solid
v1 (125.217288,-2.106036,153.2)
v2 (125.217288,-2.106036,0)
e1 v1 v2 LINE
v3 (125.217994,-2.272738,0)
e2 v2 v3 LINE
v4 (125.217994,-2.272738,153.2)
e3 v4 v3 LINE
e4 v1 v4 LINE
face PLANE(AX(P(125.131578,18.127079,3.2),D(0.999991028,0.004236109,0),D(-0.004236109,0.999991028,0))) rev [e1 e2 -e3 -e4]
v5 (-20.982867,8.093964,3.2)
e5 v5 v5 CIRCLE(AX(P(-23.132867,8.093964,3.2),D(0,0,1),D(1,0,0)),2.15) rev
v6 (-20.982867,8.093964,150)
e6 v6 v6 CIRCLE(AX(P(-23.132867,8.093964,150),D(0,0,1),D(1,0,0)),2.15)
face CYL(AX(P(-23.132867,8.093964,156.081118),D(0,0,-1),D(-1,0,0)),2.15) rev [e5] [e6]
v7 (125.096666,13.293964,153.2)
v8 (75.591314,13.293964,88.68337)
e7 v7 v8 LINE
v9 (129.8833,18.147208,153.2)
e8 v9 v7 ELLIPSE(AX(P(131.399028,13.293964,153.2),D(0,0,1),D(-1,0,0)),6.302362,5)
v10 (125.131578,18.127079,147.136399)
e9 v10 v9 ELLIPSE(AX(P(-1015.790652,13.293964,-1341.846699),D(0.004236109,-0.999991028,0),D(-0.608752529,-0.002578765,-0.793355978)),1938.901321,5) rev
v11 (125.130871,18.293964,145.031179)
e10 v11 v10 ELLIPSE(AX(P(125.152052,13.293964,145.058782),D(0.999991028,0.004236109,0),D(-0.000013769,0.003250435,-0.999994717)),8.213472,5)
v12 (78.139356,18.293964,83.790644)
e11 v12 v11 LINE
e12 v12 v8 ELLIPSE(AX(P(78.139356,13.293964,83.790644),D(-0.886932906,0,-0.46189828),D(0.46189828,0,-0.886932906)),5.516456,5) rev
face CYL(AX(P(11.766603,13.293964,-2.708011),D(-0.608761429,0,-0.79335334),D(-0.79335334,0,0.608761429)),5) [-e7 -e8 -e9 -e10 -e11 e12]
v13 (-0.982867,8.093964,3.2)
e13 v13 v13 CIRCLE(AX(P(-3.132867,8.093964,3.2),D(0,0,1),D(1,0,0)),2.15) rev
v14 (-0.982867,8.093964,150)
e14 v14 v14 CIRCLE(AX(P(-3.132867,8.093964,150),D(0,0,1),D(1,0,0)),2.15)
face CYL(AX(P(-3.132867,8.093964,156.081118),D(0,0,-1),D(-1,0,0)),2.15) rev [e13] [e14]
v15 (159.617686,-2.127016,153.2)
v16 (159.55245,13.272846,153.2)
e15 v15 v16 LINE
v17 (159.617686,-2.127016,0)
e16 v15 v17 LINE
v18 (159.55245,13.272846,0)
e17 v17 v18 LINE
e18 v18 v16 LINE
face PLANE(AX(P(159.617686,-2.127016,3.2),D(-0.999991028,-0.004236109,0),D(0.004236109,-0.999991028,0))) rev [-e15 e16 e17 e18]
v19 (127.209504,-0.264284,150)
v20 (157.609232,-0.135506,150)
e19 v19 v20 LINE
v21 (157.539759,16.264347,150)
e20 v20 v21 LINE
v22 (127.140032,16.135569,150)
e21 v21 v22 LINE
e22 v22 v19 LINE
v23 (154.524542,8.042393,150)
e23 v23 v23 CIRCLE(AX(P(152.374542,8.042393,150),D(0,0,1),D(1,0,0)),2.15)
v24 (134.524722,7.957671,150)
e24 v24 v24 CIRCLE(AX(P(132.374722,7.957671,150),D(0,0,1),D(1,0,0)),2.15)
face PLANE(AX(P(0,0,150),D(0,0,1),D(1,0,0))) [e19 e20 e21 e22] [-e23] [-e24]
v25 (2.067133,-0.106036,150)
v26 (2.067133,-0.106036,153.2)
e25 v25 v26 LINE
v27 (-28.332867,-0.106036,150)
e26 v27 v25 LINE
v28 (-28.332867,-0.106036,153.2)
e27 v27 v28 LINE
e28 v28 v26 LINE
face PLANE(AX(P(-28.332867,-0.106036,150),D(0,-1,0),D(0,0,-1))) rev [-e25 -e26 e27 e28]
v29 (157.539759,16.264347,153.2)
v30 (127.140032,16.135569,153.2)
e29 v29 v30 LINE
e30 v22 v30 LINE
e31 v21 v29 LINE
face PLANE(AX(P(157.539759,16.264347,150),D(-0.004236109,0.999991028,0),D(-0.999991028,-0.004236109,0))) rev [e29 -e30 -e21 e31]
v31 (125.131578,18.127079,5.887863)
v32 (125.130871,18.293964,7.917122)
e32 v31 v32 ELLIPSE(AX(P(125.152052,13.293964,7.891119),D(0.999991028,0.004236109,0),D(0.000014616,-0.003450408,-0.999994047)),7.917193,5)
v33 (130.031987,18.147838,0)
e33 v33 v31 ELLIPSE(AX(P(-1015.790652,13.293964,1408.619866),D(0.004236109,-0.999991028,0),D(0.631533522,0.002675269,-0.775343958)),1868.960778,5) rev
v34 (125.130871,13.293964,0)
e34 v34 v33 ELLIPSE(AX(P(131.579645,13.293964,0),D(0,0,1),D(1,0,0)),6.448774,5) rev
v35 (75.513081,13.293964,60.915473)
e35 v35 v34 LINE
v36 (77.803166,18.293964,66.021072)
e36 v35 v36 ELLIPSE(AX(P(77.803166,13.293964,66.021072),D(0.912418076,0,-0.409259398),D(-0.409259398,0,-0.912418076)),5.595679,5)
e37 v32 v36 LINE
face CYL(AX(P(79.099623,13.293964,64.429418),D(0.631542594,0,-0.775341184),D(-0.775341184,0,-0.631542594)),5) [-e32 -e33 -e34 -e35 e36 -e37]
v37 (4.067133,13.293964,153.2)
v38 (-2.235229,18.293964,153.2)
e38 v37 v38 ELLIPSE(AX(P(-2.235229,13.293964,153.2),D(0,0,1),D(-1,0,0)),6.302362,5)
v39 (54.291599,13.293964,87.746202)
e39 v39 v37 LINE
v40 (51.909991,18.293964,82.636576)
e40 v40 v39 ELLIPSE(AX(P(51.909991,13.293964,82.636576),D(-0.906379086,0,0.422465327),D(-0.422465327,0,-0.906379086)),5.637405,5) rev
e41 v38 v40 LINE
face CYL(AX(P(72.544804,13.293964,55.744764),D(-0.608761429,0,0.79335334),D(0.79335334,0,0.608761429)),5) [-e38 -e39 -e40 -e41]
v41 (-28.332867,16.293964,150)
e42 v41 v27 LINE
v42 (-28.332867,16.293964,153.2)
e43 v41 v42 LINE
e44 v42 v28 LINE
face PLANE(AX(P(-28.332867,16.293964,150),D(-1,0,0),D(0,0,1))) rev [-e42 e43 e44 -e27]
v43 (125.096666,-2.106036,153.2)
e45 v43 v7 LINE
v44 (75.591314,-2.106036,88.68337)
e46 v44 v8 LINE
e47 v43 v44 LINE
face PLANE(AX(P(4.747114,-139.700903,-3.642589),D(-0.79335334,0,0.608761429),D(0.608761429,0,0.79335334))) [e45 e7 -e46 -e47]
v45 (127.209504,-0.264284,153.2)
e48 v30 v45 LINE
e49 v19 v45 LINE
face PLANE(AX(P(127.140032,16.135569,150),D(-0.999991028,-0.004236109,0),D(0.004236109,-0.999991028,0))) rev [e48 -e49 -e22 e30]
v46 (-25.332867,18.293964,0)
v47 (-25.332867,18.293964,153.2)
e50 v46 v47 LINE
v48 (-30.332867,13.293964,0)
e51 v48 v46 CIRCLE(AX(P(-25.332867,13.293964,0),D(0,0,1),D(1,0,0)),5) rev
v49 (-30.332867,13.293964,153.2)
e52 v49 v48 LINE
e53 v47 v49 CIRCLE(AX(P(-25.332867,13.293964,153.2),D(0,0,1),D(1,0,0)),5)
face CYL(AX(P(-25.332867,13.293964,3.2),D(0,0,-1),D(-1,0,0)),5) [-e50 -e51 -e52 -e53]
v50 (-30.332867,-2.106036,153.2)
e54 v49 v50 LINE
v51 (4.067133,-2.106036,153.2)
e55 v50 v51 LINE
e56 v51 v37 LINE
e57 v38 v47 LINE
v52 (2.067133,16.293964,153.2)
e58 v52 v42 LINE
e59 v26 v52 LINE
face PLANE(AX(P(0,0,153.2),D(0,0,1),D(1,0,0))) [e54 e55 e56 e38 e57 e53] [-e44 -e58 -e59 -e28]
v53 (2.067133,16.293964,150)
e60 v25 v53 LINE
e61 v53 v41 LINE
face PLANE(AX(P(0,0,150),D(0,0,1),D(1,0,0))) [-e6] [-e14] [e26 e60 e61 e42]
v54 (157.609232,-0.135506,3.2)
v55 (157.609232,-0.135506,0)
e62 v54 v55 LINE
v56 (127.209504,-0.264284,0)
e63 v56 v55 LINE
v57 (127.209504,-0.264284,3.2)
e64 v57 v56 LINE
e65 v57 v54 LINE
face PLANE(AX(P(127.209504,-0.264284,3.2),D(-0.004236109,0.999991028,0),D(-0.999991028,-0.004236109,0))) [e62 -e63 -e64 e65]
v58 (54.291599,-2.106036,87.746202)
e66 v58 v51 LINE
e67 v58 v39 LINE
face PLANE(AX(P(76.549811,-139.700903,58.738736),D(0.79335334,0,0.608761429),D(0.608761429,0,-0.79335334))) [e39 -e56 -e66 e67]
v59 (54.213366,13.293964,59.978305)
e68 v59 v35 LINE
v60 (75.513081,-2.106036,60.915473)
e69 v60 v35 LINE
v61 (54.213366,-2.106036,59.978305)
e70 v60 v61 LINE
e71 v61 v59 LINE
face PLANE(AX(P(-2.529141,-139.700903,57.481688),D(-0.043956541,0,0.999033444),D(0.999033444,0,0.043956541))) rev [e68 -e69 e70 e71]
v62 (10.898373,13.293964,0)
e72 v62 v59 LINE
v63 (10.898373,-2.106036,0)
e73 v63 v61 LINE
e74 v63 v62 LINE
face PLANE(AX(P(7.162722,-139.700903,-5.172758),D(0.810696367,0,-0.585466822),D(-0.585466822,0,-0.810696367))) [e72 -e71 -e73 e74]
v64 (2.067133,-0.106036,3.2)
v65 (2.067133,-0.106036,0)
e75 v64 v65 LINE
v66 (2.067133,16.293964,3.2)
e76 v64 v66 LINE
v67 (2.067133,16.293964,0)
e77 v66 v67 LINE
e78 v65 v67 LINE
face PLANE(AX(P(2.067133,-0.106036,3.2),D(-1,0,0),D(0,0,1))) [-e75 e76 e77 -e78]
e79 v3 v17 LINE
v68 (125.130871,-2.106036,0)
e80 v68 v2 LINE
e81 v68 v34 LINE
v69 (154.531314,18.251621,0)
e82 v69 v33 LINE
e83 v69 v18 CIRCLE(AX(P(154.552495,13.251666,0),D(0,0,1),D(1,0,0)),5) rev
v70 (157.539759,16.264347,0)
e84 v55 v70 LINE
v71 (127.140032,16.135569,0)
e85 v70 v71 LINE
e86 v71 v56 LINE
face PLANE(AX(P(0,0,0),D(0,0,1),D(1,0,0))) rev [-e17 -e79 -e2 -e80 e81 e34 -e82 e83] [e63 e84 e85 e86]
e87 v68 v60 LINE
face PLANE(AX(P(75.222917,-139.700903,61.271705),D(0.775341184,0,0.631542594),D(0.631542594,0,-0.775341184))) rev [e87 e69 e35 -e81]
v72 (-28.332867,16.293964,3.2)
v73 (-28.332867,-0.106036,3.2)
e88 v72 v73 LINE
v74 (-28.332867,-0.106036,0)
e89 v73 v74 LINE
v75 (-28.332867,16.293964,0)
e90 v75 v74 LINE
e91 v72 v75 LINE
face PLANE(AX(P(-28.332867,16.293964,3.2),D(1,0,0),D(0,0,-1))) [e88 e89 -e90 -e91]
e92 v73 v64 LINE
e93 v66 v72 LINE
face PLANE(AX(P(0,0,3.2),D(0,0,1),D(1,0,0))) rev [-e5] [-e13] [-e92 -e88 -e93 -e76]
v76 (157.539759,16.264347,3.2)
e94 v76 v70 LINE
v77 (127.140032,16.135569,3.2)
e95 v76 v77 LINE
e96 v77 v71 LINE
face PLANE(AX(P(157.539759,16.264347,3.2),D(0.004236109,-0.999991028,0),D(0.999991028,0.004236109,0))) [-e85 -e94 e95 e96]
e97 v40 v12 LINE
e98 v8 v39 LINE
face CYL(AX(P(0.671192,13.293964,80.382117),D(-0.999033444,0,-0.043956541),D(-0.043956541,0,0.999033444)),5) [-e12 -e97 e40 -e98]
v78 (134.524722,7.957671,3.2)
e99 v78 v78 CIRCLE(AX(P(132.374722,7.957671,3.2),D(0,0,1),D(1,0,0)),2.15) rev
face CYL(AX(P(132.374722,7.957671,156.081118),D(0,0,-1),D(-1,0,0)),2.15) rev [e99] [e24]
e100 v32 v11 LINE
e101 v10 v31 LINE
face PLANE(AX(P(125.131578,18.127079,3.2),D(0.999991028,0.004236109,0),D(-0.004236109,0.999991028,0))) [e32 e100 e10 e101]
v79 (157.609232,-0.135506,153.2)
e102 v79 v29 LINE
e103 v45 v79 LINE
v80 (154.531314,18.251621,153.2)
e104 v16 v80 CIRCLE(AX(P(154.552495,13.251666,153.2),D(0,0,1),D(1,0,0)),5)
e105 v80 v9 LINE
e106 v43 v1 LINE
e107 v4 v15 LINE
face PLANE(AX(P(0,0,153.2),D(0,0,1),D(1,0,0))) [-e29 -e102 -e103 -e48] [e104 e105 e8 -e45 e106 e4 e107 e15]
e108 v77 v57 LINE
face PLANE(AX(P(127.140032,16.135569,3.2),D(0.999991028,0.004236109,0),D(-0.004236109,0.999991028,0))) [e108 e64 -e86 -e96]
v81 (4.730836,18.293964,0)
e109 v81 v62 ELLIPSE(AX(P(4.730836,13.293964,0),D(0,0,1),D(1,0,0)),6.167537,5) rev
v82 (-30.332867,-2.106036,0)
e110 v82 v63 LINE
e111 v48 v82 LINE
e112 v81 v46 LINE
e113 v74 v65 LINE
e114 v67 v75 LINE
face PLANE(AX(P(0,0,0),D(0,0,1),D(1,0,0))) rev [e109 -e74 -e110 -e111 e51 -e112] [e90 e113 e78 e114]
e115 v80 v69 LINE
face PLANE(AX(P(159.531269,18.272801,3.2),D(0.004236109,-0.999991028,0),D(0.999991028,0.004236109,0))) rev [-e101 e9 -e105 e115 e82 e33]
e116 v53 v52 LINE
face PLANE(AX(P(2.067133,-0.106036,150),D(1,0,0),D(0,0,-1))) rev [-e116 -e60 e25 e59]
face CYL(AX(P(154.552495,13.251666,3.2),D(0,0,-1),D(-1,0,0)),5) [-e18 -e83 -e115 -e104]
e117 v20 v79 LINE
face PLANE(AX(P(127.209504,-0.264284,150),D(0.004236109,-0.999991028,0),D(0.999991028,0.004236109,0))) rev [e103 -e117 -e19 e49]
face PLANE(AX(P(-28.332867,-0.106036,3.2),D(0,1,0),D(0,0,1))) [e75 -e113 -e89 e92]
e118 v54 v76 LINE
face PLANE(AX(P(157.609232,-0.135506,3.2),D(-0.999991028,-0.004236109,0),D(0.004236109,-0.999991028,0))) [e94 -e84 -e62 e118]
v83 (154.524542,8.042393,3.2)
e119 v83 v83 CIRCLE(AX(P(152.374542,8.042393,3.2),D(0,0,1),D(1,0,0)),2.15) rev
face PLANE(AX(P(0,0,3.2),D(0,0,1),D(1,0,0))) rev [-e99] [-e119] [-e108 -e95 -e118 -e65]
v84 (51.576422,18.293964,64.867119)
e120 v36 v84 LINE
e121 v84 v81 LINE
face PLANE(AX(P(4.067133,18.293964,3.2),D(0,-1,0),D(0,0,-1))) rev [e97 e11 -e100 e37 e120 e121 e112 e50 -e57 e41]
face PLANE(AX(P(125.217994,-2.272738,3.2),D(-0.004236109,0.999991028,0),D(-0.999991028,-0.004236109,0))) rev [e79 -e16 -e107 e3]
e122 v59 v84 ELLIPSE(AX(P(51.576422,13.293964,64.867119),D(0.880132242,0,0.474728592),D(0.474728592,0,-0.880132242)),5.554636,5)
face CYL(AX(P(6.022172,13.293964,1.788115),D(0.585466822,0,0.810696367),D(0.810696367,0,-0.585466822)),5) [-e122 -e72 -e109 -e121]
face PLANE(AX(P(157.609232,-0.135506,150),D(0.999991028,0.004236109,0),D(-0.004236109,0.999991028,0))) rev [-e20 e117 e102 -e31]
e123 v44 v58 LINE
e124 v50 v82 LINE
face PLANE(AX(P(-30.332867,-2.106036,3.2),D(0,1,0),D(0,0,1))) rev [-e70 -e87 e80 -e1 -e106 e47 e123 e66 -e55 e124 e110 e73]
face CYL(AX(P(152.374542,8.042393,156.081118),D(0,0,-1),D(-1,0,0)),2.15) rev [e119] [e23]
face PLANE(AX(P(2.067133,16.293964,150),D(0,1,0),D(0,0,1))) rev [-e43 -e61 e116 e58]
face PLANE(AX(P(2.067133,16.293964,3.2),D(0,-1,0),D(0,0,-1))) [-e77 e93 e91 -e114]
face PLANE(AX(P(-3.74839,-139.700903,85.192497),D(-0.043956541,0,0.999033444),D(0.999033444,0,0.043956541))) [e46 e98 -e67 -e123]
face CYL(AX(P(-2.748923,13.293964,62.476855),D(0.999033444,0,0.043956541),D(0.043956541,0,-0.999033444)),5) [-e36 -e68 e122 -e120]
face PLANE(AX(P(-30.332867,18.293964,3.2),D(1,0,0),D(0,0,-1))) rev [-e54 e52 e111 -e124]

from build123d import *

# Parameters (mm, degrees)
SKETCH1_W             = 34.4
SKETCH1_H             = 20.4
SKETCH1_W_2           = 30.4
SKETCH1_H_2           = 16.4
BOSS_EXTRUDE1_DEPTH   = 3.2
BOSS_EXTRUDE1_2_DEPTH = 3.2
SKETCH4_W             = 34.4
SKETCH4_H             = 20.4
BOSS_EXTRUDE2_DEPTH   = 150
SKETCH5_W             = 30.4
SKETCH5_H             = 16.4
CUT_EXTRUDE2_DEPTH    = 3.2
BOSS_EXTRUDE4_REACH   = 221.091
SKETCH13_W            = 153.2
SKETCH13_H            = 20.4
CUT_EXTRUDE3_DEPTH    = 20.4
FILLET1_R             = 5
SKETCH2_R             = 2.15
CUT_EXTRUDE5_DEPTH    = 147


with BuildPart() as part:
    # Sketch1 → Boss-Extrude1 (new body)
    with BuildSketch(Plane.XY):
        with Locations((-13.13286664, 8.093964388)):
            Rectangle(SKETCH1_W, SKETCH1_H)
        with Locations((-13.13286664, 8.093964388)):
            Rectangle(SKETCH1_W_2, SKETCH1_H_2, mode=Mode.SUBTRACT)
    extrude(amount=BOSS_EXTRUDE1_DEPTH)



with BuildPart() as body_2:
    # Sketch1 → Boss-Extrude1 2 (new body)
    with BuildSketch(Plane.XY):
        Polygon((125.217994466, -2.2727378), (159.617685817, -2.127015635), (159.531269184, 18.272801329), (125.131577833, 18.127079165), align=None)
        Polygon((127.209504302, -0.264283525), (157.609231543, -0.135505799), (157.539759348, 16.264347055), (127.140032108, 16.135569328), align=None, mode=Mode.SUBTRACT)
    extrude(amount=BOSS_EXTRUDE1_2_DEPTH)


with BuildPart() as part_1:
    add(part.part)

    add(body_2.part)  # Boss-Extrude2 merges body 2
    # Sketch4 → Boss-Extrude2 (add)
    with BuildSketch(Plane.XY.offset(3.2)):
        with Locations((-13.13286664, 8.093964388)):
            Rectangle(SKETCH4_W, SKETCH4_H)
        Polygon((125.131577833, 18.127079165), (125.217994466, -2.2727378), (159.617685817, -2.127015635), (159.531269184, 18.272801329), align=None)
    extrude(amount=BOSS_EXTRUDE2_DEPTH)

    # Sketch5 → Cut-Extrude2 (cut)
    with BuildSketch(Plane.XY.offset(153.2)):
        with Locations((-13.13286664, 8.093964388)):
            Rectangle(SKETCH5_W, SKETCH5_H)
        Polygon((157.539759348, 16.264347055), (127.140032108, 16.135569328), (127.209504302, -0.264283525), (157.609231543, -0.135505799), align=None)
    extrude(amount=-CUT_EXTRUDE2_DEPTH, mode=Mode.SUBTRACT)

    # Boss-Extrude4: up to this face of the body (flat: up to its plane)
    boss_extrude4_end = Plane(part_1.part.faces().sort_by_distance((125.17478615, 7.927170683, 76.6))[0])
    # Sketch13 → Boss-Extrude4 (add, up to the picked face)
    with BuildSketch(Plane(origin=(4.06713336, 0, 0), x_dir=(0, 0, -1), z_dir=(1, 0, 0)), mode=Mode.PRIVATE) as boss_extrude4_sk1:
        with Locations((-76.6, 8.093964388)):
            Rectangle(SKETCH13_W, SKETCH13_H)
    boss_extrude4_tool1 = split(extrude(boss_extrude4_sk1.sketch, amount=BOSS_EXTRUDE4_REACH, mode=Mode.PRIVATE), bisect_by=boss_extrude4_end, keep=Keep.BOTH, mode=Mode.PRIVATE)
    add(boss_extrude4_tool1.solids().sort_by(Axis((4.067133, 8.093964, 76.6), (1, 0, 0)))[0])

    # Sketch14 → Cut-Extrude3 (cut)
    with BuildSketch(Plane(origin=(0, 18.293964388, 0), x_dir=(1, 0, 0), z_dir=(0, 1, 0))):
        Polygon((4.06713336, -153.2), (64.581899601, -153.2), (64.581899601, -88.198965672), (54.291599005, -87.746202034), align=None)
        Polygon((64.581899601, -88.198965672), (64.581899601, -153.2), (125.096665842, -153.2), (75.591314205, -88.683369655), align=None)
        Polygon((64.581899601, 0), (64.581899601, -60.434510767), (75.513081453, -60.915472582), (125.130870883, 0), align=None)
        Polygon((54.213366253, -59.978304961), (64.581899601, -60.434510767), (64.581899601, 0), (10.898373068, 0), align=None)
    extrude(amount=-CUT_EXTRUDE3_DEPTH, mode=Mode.SUBTRACT)

    # Fillet1
    # the kernel refuses this fillet: 5 mm, written as the material it takes off along each edge
    with BuildSketch(Plane(origin=(132.706183705, 18.293964388, 163.116916754), x_dir=(0.7933533402912364, 0, -0.6087614290087192), z_dir=(-0.6087614290087191, 0, -0.7933533402912364))) as fillet1_piece_1_section:
        with BuildLine():
            CenterArc((FILLET1_R, FILLET1_R), FILLET1_R, 180, 90)
            Line((0, FILLET1_R), (0, 0))
            Line((0, 0), (FILLET1_R, 0))
        make_face()
    fillet1_piece_1 = extrude(amount=106.321432794, mode=Mode.PRIVATE)
    fillet1_piece_1 = split(fillet1_piece_1, bisect_by=Plane(origin=(106.88840911, 17.155782702, 90.060412668), z_dir=(-0.04395654061558545, 0, 0.999033444153453)), keep=Keep.TOP, mode=Mode.PRIVATE)
    add(fillet1_piece_1, mode=Mode.SUBTRACT)
    with BuildSketch(Plane(origin=(41.803680953, 18.293964388, 87.196745277), x_dir=(0.0439565406155861, 0, -0.9990334441534529), z_dir=(0.999033444153453, 0, 0.043956540615586105))) as fillet1_piece_2_section:
        with BuildLine():
            CenterArc((FILLET1_R, -FILLET1_R), FILLET1_R, 90, 90)
            Line((0, -FILLET1_R), (0, 0))
            Line((0, 0), (FILLET1_R, 0))
        make_face()
    fillet1_piece_2 = extrude(amount=46.320322483, mode=Mode.PRIVATE)
    fillet1_piece_2 = split(fillet1_piece_2, bisect_by=Plane(origin=(58.505653555, 17.10801654, 82.254339222), z_dir=(0.7933533402912364, 0, 0.6087614290087192)), keep=Keep.TOP, mode=Mode.PRIVATE)
    fillet1_piece_2 = split(fillet1_piece_2, bisect_by=Plane(origin=(70.904619218, 17.10801654, 82.575549833), z_dir=(-0.7933533402912364, 0, 0.6087614290087191)), keep=Keep.TOP, mode=Mode.PRIVATE)
    add(fillet1_piece_2, mode=Mode.SUBTRACT)
    with BuildSketch(Plane(origin=(61.901116868, 18.293964388, 77.829285281), x_dir=(-0.7933533402912364, 0, -0.6087614290087192), z_dir=(-0.6087614290087192, 0, 0.7933533402912364))) as fillet1_piece_3_section:
        with BuildLine():
            CenterArc((FILLET1_R, FILLET1_R), FILLET1_R, 180, 90)
            Line((0, FILLET1_R), (0, 0))
            Line((0, 0), (FILLET1_R, 0))
        make_face()
    fillet1_piece_3 = extrude(amount=107.502706728, mode=Mode.PRIVATE)
    fillet1_piece_3 = split(fillet1_piece_3, bisect_by=Plane(origin=(25.940785784, 17.156890776, 86.498792671), z_dir=(-0.04395654061558545, 0, 0.999033444153453)), keep=Keep.TOP, mode=Mode.PRIVATE)
    add(fillet1_piece_3, mode=Mode.SUBTRACT)
    with BuildSketch(Plane(origin=(67.618799022, 18.293964388, 70.607237381), x_dir=(0.7753411838603286, 0, 0.6315425944542964), z_dir=(0.6315425944542965, 0, -0.7753411838603287))) as fillet1_piece_4_section:
        with BuildLine():
            CenterArc((FILLET1_R, FILLET1_R), FILLET1_R, 180, 90)
            Line((0, FILLET1_R), (0, 0))
            Line((0, 0), (FILLET1_R, 0))
        make_face()
    fillet1_piece_4 = extrude(amount=103.566022095, mode=Mode.PRIVATE)
    fillet1_piece_4 = split(fillet1_piece_4, bisect_by=Plane(origin=(103.811838578, 17.156329457, 62.160591526), z_dir=(0.04395654061558577, 0, -0.999033444153453)), keep=Keep.TOP, mode=Mode.PRIVATE)
    add(fillet1_piece_4, mode=Mode.SUBTRACT)
    with BuildSketch(Plane(origin=(41.725448201, 18.293964388, 59.428848203), x_dir=(-0.043956540615586105, 0, 0.9990334441534529), z_dir=(0.999033444153453, 0, 0.043956540615586105))) as fillet1_piece_5_section:
        with BuildLine():
            CenterArc((FILLET1_R, FILLET1_R), FILLET1_R, 180, 90)
            Line((0, FILLET1_R), (0, 0))
            Line((0, 0), (FILLET1_R, 0))
        make_face()
    fillet1_piece_5 = extrude(amount=46.320322483, mode=Mode.PRIVATE)
    fillet1_piece_5 = split(fillet1_piece_5, bisect_by=Plane(origin=(58.573091319, 17.108176182, 66.015219672), z_dir=(0.8106963672203948, 0, -0.5854668224380052)), keep=Keep.TOP, mode=Mode.PRIVATE)
    fillet1_piece_5 = split(fillet1_piece_5, bisect_by=Plane(origin=(70.976745321, 17.108176182, 66.484706167), z_dir=(-0.7753411838603287, 0, -0.6315425944542965)), keep=Keep.TOP, mode=Mode.PRIVATE)
    add(fillet1_piece_5, mode=Mode.SUBTRACT)
    with BuildSketch(Plane(origin=(3.580037788, 18.293964388, -10.13370459), x_dir=(-0.810696367220395, 0, 0.5854668224380052), z_dir=(0.5854668224380052, 0, 0.8106963672203948))) as fillet1_piece_6_section:
        with BuildLine():
            CenterArc((FILLET1_R, FILLET1_R), FILLET1_R, 180, 90)
            Line((0, FILLET1_R), (0, 0))
            Line((0, 0), (FILLET1_R, 0))
        make_face()
    fillet1_piece_6 = extrude(amount=98.983685368, mode=Mode.PRIVATE)
    fillet1_piece_6 = split(fillet1_piece_6, bisect_by=Plane(origin=(26.252750118, 17.155642398, 58.748063906), z_dir=(0.04395654061558577, 0, -0.999033444153453)), keep=Keep.TOP, mode=Mode.PRIVATE)
    add(fillet1_piece_6, mode=Mode.SUBTRACT)
    with BuildSketch(Plane(origin=(159.531269184, 18.272801329, -12.5), x_dir=(0.004236109424476813, -0.9999910276482205, 0), z_dir=(0, 0, 1))) as fillet1_piece_7:
        with BuildLine():
            CenterArc((FILLET1_R, -FILLET1_R), FILLET1_R, 90, 90)
            Line((0, -FILLET1_R), (0, 0))
            Line((0, 0), (FILLET1_R, 0))
        make_face()
    extrude(amount=178.2, mode=Mode.SUBTRACT)
    with BuildSketch(Plane(origin=(-30.33286664, 18.293964388, 165.7), x_dir=(1, 0, 0), z_dir=(0, 0, -1))) as fillet1_piece_8:
        with BuildLine():
            CenterArc((FILLET1_R, FILLET1_R), FILLET1_R, 180, 90)
            Line((0, FILLET1_R), (0, 0))
            Line((0, 0), (FILLET1_R, 0))
        make_face()
    extrude(amount=178.2, mode=Mode.SUBTRACT)
    with BuildSketch(Plane(origin=(41.803680953, 18.293964388, 87.196745277), x_dir=(0.0439565406155861, 0, -0.9990334441534529), z_dir=(0.999033444153453, 0, 0.043956540615586105))) as fillet1_piece_9a_section:
        with BuildLine():
            CenterArc((FILLET1_R, -FILLET1_R), FILLET1_R, 90, 90)
            Line((0, -FILLET1_R), (0, 0))
            Line((0, 0), (FILLET1_R, 0))
        make_face()
    fillet1_piece_9a = extrude(amount=46.320322483, mode=Mode.PRIVATE)
    fillet1_piece_9a = split(fillet1_piece_9a, bisect_by=Plane(origin=(77.278437613, 17.204839872, 90.882071688), z_dir=(0.7933533402912364, 0, -0.6087614290087191)), keep=Keep.TOP, mode=Mode.PRIVATE)
    with BuildSketch(Plane(origin=(132.706183705, 18.293964388, 163.116916754), x_dir=(0.7933533402912364, 0, -0.6087614290087192), z_dir=(-0.6087614290087191, 0, -0.7933533402912364))) as fillet1_piece_9b_section:
        with BuildLine():
            CenterArc((FILLET1_R, FILLET1_R), FILLET1_R, 180, 90)
            Line((0, FILLET1_R), (0, 0))
            Line((0, 0), (FILLET1_R, 0))
        make_face()
    fillet1_piece_9b = extrude(amount=106.321432794, mode=Mode.PRIVATE)
    fillet1_piece_9b = split(fillet1_piece_9b, bisect_by=Plane(origin=(72.822589663, 17.204839872, 88.561548356), z_dir=(0.04395654061558545, 0, -0.999033444153453)), keep=Keep.TOP, mode=Mode.PRIVATE)
    fillet1_piece_9 = fillet1_piece_9a & fillet1_piece_9b
    add(fillet1_piece_9, mode=Mode.SUBTRACT)
    with BuildSketch(Plane(origin=(61.901116868, 18.293964388, 77.829285281), x_dir=(-0.7933533402912364, 0, -0.6087614290087192), z_dir=(-0.6087614290087192, 0, 0.7933533402912364))) as fillet1_piece_10a_section:
        with BuildLine():
            CenterArc((FILLET1_R, FILLET1_R), FILLET1_R, 180, 90)
            Line((0, FILLET1_R), (0, 0))
            Line((0, 0), (FILLET1_R, 0))
        make_face()
    fillet1_piece_10a = extrude(amount=107.502706728, mode=Mode.PRIVATE)
    fillet1_piece_10a = split(fillet1_piece_10a, bisect_by=Plane(origin=(56.655534386, 17.19812243, 87.850212988), z_dir=(0.04395654061558545, 0, -0.999033444153453)), keep=Keep.TOP, mode=Mode.PRIVATE)
    with BuildSketch(Plane(origin=(41.803680953, 18.293964388, 87.196745277), x_dir=(0.0439565406155861, 0, -0.9990334441534529), z_dir=(0.999033444153453, 0, 0.043956540615586105))) as fillet1_piece_10b_section:
        with BuildLine():
            CenterArc((FILLET1_R, -FILLET1_R), FILLET1_R, 90, 90)
            Line((0, -FILLET1_R), (0, 0))
            Line((0, 0), (FILLET1_R, 0))
        make_face()
    fillet1_piece_10b = extrude(amount=46.320322483, mode=Mode.PRIVATE)
    fillet1_piece_10b = split(fillet1_piece_10b, bisect_by=Plane(origin=(52.851134035, 17.19812243, 89.623452533), z_dir=(-0.7933533402912364, 0, -0.6087614290087192)), keep=Keep.TOP, mode=Mode.PRIVATE)
    fillet1_piece_10 = fillet1_piece_10a & fillet1_piece_10b
    add(fillet1_piece_10, mode=Mode.SUBTRACT)
    with BuildSketch(Plane(origin=(67.618799022, 18.293964388, 70.607237381), x_dir=(0.7753411838603286, 0, 0.6315425944542964), z_dir=(0.6315425944542965, 0, -0.7753411838603287))) as fillet1_piece_11a_section:
        with BuildLine():
            CenterArc((FILLET1_R, FILLET1_R), FILLET1_R, 180, 90)
            Line((0, FILLET1_R), (0, 0))
            Line((0, 0), (FILLET1_R, 0))
        make_face()
    fillet1_piece_11a = extrude(amount=103.566022095, mode=Mode.PRIVATE)
    fillet1_piece_11a = split(fillet1_piece_11a, bisect_by=Plane(origin=(73.01107528, 17.200259545, 60.805386642), z_dir=(-0.04395654061558577, 0, 0.999033444153453)), keep=Keep.TOP, mode=Mode.PRIVATE)
    with BuildSketch(Plane(origin=(41.725448201, 18.293964388, 59.428848203), x_dir=(-0.043956540615586105, 0, 0.9990334441534529), z_dir=(0.999033444153453, 0, 0.043956540615586105))) as fillet1_piece_11b_section:
        with BuildLine():
            CenterArc((FILLET1_R, FILLET1_R), FILLET1_R, 180, 90)
            Line((0, FILLET1_R), (0, 0))
            Line((0, 0), (FILLET1_R, 0))
        make_face()
    fillet1_piece_11b = extrude(amount=46.320322483, mode=Mode.PRIVATE)
    fillet1_piece_11b = split(fillet1_piece_11b, bisect_by=Plane(origin=(77.094733678, 17.200259545, 58.97368731), z_dir=(0.7753411838603287, 0, 0.6315425944542965)), keep=Keep.TOP, mode=Mode.PRIVATE)
    fillet1_piece_11 = fillet1_piece_11a & fillet1_piece_11b
    add(fillet1_piece_11, mode=Mode.SUBTRACT)
    with BuildSketch(Plane(origin=(41.725448201, 18.293964388, 59.428848203), x_dir=(-0.043956540615586105, 0, 0.9990334441534529), z_dir=(0.999033444153453, 0, 0.043956540615586105))) as fillet1_piece_12a_section:
        with BuildLine():
            CenterArc((FILLET1_R, FILLET1_R), FILLET1_R, 180, 90)
            Line((0, FILLET1_R), (0, 0))
            Line((0, 0), (FILLET1_R, 0))
        make_face()
    fillet1_piece_12a = extrude(amount=46.320322483, mode=Mode.PRIVATE)
    fillet1_piece_12a = split(fillet1_piece_12a, bisect_by=Plane(origin=(52.666515046, 17.202537245, 57.836378885), z_dir=(-0.8106963672203948, 0, 0.5854668224380052)), keep=Keep.TOP, mode=Mode.PRIVATE)
    with BuildSketch(Plane(origin=(3.580037788, 18.293964388, -10.13370459), x_dir=(-0.810696367220395, 0, 0.5854668224380052), z_dir=(0.5854668224380052, 0, 0.8106963672203948))) as fillet1_piece_12b_section:
        with BuildLine():
            CenterArc((FILLET1_R, FILLET1_R), FILLET1_R, 180, 90)
            Line((0, FILLET1_R), (0, 0))
            Line((0, 0), (FILLET1_R, 0))
        make_face()
    fillet1_piece_12b = extrude(amount=98.983685368, mode=Mode.PRIVATE)
    fillet1_piece_12b = split(fillet1_piece_12b, bisect_by=Plane(origin=(56.852894283, 17.202537245, 60.094441735), z_dir=(-0.04395654061558577, 0, 0.999033444153453)), keep=Keep.TOP, mode=Mode.PRIVATE)
    fillet1_piece_12 = fillet1_piece_12a & fillet1_piece_12b
    add(fillet1_piece_12, mode=Mode.SUBTRACT)

    # Sketch2 → Cut-Extrude5 (cut)
    with BuildSketch(Plane.XY.offset(3)):
        with Locations((-23.13286664, 8.093964388)):
            Circle(SKETCH2_R)
        with Locations((-3.13286664, 8.093964388)):
            Circle(SKETCH2_R)
        with Locations((132.374721549, 7.95767067)):
            Circle(SKETCH2_R)
        with Locations((152.374542102, 8.042392859)):
            Circle(SKETCH2_R)
    extrude(amount=CUT_EXTRUDE5_DEPTH, mode=Mode.SUBTRACT)


solid = part_1.part
